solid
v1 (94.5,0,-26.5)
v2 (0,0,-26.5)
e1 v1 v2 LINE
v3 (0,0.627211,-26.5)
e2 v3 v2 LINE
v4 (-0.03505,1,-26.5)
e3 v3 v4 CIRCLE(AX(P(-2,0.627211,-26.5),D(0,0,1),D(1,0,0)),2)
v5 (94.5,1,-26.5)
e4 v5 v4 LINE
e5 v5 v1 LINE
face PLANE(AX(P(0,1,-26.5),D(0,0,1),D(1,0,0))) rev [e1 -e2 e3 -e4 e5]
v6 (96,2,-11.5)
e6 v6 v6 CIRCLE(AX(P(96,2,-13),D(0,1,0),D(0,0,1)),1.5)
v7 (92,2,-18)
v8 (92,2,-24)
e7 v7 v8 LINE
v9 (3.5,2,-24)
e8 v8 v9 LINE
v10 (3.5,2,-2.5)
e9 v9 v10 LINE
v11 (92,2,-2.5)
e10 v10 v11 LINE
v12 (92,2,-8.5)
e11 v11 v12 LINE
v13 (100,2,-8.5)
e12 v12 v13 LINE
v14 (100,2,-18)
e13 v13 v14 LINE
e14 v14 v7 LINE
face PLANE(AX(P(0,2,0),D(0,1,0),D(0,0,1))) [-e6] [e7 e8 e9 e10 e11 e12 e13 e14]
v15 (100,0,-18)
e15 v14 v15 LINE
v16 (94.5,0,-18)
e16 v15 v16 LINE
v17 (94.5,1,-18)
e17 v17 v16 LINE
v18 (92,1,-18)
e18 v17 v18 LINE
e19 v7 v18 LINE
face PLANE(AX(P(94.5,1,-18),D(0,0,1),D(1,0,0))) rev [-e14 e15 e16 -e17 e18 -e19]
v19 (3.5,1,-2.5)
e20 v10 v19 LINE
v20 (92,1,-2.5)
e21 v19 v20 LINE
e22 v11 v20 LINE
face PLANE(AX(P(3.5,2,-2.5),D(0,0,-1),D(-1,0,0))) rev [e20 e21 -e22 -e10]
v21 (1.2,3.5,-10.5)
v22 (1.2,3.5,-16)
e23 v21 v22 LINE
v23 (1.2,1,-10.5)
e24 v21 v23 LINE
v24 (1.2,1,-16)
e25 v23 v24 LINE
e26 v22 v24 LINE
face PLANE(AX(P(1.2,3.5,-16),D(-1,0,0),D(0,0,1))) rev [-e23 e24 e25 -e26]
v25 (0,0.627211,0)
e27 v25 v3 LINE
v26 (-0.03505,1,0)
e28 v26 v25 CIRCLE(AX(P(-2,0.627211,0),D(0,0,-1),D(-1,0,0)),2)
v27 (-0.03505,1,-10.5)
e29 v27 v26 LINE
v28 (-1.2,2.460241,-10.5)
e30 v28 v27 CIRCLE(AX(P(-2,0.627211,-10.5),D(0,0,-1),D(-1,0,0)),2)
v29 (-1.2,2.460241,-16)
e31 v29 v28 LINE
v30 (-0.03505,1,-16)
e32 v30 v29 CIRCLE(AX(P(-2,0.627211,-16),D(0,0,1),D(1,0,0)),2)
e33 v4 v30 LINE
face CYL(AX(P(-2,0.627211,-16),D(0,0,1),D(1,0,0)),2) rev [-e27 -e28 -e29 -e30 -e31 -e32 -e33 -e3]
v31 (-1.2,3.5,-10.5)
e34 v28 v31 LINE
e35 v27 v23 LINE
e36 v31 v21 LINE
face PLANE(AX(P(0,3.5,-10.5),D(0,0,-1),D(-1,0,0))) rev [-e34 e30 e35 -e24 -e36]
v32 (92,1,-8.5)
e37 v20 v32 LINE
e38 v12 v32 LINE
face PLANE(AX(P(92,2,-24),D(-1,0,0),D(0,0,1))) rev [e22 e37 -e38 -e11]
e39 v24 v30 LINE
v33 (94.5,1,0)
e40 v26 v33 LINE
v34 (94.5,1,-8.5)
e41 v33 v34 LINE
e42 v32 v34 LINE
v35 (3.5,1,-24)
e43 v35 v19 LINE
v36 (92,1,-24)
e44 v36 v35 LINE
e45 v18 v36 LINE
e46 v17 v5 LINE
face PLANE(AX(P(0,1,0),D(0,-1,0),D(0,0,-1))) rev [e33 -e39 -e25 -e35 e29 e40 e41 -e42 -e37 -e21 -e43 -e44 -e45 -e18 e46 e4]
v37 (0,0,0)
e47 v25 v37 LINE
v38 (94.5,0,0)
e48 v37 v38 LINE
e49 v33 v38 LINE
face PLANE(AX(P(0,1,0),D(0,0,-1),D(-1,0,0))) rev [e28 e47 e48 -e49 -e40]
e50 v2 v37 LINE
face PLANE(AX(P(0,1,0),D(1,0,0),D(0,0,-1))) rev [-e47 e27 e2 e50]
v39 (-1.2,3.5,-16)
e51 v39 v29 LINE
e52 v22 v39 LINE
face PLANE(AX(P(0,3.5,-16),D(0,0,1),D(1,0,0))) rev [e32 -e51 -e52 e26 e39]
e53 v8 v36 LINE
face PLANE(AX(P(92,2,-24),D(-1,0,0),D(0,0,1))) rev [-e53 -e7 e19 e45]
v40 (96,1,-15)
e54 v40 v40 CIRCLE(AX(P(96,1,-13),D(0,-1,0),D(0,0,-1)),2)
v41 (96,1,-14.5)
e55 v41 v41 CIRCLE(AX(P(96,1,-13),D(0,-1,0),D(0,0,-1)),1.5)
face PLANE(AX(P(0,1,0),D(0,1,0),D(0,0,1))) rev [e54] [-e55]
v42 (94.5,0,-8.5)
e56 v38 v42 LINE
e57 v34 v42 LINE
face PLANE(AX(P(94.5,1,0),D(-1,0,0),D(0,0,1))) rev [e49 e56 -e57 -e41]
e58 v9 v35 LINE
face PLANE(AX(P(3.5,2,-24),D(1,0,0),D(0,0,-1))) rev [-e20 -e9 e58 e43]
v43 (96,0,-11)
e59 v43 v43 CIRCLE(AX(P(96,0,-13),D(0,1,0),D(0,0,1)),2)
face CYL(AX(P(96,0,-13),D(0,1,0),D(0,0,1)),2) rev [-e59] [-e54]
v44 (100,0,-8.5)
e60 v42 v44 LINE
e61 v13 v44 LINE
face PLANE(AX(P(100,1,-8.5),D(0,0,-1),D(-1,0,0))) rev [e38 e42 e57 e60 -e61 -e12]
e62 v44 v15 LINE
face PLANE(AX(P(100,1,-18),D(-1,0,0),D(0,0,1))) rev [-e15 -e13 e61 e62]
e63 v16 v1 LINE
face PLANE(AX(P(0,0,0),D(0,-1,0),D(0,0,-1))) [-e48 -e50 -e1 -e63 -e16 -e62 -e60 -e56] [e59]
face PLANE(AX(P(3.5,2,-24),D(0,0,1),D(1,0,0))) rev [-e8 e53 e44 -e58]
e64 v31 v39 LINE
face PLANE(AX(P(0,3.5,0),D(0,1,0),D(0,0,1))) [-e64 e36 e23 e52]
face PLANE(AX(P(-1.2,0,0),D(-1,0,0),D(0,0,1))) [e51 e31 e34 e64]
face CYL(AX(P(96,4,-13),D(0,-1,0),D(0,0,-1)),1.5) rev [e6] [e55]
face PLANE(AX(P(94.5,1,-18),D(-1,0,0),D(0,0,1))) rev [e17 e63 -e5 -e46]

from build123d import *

# Parameters (mm, degrees)
BOSS_EXTRUDE1_DEPTH     = 1
CUT_EXTRUDE3_DEPTH      = 104.456512603
CUT_EXTRUDE3_DEPTH_BACK = 104.456512603
SKETCH6_R               = 2
SKETCH2_W               = 88.5
SKETCH2_H               = 21.5
BOSS_EXTRUDE2_DEPTH     = 1
SKETCH3_W               = 1.2
SKETCH3_H               = 5.5
BOSS_EXTRUDE3_DEPTH     = 2.5
SKETCH7_W               = 8
SKETCH7_H               = 9.5
BOSS_EXTRUDE4_DEPTH     = 1
SKETCH8_R               = 1.5
CUT_EXTRUDE4_DEPTH      = 3
SKETCH9_W               = 5.5
SKETCH9_H               = 1.039758998
BOSS_EXTRUDE5_DEPTH     = 1.2
FILLET3_START           = -16
FILLET3_DEPTH           = 5.5
FILLET3_START_2         = -26.5
FILLET3_2_DEPTH         = 26.5


with BuildPart() as part:
    # Sketch1 → Boss-Extrude1 (new body)
    with BuildSketch(Plane(origin=(0, 0, 0), x_dir=(1, 0, 0), z_dir=(0, 1, 0))):
        Polygon((94.5, 18), (100, 18), (100, 8.5), (94.5, 8.5), (94.5, 0), (0, 0), (0, 26.5), (94.5, 26.5), align=None)
    extrude(amount=BOSS_EXTRUDE1_DEPTH)

    # Sketch6 → Cut-Extrude3 (cut, two sides: drawn at the far end of the back side and taken through both)
    with BuildSketch(Plane(origin=(0, 1, 0), x_dir=(1, 0, 0), z_dir=(0, 1, 0)).offset(-CUT_EXTRUDE3_DEPTH_BACK)):
        with Locations(Location((96, 13, 0), (0, 0, 270))):
            Circle(SKETCH6_R)
    extrude(amount=CUT_EXTRUDE3_DEPTH + CUT_EXTRUDE3_DEPTH_BACK, mode=Mode.SUBTRACT)

    # Sketch2 → Boss-Extrude2 (add)
    with BuildSketch(Plane(origin=(0, 1, 0), x_dir=(1, 0, 0), z_dir=(0, 1, 0))):
        with Locations((47.75, 13.25)):
            Rectangle(SKETCH2_W, SKETCH2_H)
    extrude(amount=BOSS_EXTRUDE2_DEPTH)

    # Sketch3 → Boss-Extrude3 (add)
    with BuildSketch(Plane(origin=(0, 1, 0), x_dir=(1, 0, 0), z_dir=(0, 1, 0))):
        with Locations((0.6, 13.25)):
            Rectangle(SKETCH3_W, SKETCH3_H)
    extrude(amount=BOSS_EXTRUDE3_DEPTH)

    # Sketch7 → Boss-Extrude4 (add)
    with BuildSketch(Plane(origin=(0, 1, 0), x_dir=(1, 0, 0), z_dir=(0, 1, 0))):
        with Locations((96, 13.25)):
            Rectangle(SKETCH7_W, SKETCH7_H)
    extrude(amount=BOSS_EXTRUDE4_DEPTH)

    # Sketch8 → Cut-Extrude4 (cut)
    with BuildSketch(Plane.XZ.offset(-1)):
        with Locations(Location((96, -13, 0), (0, 0, 270))):
            Circle(SKETCH8_R)
    extrude(amount=-CUT_EXTRUDE4_DEPTH, mode=Mode.SUBTRACT)

    # Sketch9 → Boss-Extrude5 (add)
    with BuildSketch(Plane.ZY):
        with Locations((-13.25, 2.980120501)):
            Rectangle(SKETCH9_W, SKETCH9_H)
    extrude(amount=BOSS_EXTRUDE5_DEPTH)

    # Fillet3: read off the stored shape, not the designer's step
    # Fillet3 outline → Fillet3 (add)
    with BuildSketch(Plane.XY.offset(FILLET3_START)):
        with BuildLine():
            Line((0, 0.627210724), (0, 2.460241002))
            Line((0, 2.460241002), (-1.2, 2.460241002))
            ThreePointArc((-1.2, 2.460241002), (-0.326679947, 1.722655839), (0, 0.627210724))
        make_face()
    extrude(amount=FILLET3_DEPTH)

    # Fillet3 2 outline → Fillet3 2 (add)
    with BuildSketch(Plane.XY.offset(FILLET3_START_2)):
        with BuildLine():
            ThreePointArc((-0.035050088, 1), (-0.008781802, 0.814427412), (0, 0.627210724))
            Line((0, 0.627210724), (0, 1))
            Line((0, 1), (-0.035050088, 1))
        make_face()
    extrude(amount=FILLET3_2_DEPTH)


solid = part.part
